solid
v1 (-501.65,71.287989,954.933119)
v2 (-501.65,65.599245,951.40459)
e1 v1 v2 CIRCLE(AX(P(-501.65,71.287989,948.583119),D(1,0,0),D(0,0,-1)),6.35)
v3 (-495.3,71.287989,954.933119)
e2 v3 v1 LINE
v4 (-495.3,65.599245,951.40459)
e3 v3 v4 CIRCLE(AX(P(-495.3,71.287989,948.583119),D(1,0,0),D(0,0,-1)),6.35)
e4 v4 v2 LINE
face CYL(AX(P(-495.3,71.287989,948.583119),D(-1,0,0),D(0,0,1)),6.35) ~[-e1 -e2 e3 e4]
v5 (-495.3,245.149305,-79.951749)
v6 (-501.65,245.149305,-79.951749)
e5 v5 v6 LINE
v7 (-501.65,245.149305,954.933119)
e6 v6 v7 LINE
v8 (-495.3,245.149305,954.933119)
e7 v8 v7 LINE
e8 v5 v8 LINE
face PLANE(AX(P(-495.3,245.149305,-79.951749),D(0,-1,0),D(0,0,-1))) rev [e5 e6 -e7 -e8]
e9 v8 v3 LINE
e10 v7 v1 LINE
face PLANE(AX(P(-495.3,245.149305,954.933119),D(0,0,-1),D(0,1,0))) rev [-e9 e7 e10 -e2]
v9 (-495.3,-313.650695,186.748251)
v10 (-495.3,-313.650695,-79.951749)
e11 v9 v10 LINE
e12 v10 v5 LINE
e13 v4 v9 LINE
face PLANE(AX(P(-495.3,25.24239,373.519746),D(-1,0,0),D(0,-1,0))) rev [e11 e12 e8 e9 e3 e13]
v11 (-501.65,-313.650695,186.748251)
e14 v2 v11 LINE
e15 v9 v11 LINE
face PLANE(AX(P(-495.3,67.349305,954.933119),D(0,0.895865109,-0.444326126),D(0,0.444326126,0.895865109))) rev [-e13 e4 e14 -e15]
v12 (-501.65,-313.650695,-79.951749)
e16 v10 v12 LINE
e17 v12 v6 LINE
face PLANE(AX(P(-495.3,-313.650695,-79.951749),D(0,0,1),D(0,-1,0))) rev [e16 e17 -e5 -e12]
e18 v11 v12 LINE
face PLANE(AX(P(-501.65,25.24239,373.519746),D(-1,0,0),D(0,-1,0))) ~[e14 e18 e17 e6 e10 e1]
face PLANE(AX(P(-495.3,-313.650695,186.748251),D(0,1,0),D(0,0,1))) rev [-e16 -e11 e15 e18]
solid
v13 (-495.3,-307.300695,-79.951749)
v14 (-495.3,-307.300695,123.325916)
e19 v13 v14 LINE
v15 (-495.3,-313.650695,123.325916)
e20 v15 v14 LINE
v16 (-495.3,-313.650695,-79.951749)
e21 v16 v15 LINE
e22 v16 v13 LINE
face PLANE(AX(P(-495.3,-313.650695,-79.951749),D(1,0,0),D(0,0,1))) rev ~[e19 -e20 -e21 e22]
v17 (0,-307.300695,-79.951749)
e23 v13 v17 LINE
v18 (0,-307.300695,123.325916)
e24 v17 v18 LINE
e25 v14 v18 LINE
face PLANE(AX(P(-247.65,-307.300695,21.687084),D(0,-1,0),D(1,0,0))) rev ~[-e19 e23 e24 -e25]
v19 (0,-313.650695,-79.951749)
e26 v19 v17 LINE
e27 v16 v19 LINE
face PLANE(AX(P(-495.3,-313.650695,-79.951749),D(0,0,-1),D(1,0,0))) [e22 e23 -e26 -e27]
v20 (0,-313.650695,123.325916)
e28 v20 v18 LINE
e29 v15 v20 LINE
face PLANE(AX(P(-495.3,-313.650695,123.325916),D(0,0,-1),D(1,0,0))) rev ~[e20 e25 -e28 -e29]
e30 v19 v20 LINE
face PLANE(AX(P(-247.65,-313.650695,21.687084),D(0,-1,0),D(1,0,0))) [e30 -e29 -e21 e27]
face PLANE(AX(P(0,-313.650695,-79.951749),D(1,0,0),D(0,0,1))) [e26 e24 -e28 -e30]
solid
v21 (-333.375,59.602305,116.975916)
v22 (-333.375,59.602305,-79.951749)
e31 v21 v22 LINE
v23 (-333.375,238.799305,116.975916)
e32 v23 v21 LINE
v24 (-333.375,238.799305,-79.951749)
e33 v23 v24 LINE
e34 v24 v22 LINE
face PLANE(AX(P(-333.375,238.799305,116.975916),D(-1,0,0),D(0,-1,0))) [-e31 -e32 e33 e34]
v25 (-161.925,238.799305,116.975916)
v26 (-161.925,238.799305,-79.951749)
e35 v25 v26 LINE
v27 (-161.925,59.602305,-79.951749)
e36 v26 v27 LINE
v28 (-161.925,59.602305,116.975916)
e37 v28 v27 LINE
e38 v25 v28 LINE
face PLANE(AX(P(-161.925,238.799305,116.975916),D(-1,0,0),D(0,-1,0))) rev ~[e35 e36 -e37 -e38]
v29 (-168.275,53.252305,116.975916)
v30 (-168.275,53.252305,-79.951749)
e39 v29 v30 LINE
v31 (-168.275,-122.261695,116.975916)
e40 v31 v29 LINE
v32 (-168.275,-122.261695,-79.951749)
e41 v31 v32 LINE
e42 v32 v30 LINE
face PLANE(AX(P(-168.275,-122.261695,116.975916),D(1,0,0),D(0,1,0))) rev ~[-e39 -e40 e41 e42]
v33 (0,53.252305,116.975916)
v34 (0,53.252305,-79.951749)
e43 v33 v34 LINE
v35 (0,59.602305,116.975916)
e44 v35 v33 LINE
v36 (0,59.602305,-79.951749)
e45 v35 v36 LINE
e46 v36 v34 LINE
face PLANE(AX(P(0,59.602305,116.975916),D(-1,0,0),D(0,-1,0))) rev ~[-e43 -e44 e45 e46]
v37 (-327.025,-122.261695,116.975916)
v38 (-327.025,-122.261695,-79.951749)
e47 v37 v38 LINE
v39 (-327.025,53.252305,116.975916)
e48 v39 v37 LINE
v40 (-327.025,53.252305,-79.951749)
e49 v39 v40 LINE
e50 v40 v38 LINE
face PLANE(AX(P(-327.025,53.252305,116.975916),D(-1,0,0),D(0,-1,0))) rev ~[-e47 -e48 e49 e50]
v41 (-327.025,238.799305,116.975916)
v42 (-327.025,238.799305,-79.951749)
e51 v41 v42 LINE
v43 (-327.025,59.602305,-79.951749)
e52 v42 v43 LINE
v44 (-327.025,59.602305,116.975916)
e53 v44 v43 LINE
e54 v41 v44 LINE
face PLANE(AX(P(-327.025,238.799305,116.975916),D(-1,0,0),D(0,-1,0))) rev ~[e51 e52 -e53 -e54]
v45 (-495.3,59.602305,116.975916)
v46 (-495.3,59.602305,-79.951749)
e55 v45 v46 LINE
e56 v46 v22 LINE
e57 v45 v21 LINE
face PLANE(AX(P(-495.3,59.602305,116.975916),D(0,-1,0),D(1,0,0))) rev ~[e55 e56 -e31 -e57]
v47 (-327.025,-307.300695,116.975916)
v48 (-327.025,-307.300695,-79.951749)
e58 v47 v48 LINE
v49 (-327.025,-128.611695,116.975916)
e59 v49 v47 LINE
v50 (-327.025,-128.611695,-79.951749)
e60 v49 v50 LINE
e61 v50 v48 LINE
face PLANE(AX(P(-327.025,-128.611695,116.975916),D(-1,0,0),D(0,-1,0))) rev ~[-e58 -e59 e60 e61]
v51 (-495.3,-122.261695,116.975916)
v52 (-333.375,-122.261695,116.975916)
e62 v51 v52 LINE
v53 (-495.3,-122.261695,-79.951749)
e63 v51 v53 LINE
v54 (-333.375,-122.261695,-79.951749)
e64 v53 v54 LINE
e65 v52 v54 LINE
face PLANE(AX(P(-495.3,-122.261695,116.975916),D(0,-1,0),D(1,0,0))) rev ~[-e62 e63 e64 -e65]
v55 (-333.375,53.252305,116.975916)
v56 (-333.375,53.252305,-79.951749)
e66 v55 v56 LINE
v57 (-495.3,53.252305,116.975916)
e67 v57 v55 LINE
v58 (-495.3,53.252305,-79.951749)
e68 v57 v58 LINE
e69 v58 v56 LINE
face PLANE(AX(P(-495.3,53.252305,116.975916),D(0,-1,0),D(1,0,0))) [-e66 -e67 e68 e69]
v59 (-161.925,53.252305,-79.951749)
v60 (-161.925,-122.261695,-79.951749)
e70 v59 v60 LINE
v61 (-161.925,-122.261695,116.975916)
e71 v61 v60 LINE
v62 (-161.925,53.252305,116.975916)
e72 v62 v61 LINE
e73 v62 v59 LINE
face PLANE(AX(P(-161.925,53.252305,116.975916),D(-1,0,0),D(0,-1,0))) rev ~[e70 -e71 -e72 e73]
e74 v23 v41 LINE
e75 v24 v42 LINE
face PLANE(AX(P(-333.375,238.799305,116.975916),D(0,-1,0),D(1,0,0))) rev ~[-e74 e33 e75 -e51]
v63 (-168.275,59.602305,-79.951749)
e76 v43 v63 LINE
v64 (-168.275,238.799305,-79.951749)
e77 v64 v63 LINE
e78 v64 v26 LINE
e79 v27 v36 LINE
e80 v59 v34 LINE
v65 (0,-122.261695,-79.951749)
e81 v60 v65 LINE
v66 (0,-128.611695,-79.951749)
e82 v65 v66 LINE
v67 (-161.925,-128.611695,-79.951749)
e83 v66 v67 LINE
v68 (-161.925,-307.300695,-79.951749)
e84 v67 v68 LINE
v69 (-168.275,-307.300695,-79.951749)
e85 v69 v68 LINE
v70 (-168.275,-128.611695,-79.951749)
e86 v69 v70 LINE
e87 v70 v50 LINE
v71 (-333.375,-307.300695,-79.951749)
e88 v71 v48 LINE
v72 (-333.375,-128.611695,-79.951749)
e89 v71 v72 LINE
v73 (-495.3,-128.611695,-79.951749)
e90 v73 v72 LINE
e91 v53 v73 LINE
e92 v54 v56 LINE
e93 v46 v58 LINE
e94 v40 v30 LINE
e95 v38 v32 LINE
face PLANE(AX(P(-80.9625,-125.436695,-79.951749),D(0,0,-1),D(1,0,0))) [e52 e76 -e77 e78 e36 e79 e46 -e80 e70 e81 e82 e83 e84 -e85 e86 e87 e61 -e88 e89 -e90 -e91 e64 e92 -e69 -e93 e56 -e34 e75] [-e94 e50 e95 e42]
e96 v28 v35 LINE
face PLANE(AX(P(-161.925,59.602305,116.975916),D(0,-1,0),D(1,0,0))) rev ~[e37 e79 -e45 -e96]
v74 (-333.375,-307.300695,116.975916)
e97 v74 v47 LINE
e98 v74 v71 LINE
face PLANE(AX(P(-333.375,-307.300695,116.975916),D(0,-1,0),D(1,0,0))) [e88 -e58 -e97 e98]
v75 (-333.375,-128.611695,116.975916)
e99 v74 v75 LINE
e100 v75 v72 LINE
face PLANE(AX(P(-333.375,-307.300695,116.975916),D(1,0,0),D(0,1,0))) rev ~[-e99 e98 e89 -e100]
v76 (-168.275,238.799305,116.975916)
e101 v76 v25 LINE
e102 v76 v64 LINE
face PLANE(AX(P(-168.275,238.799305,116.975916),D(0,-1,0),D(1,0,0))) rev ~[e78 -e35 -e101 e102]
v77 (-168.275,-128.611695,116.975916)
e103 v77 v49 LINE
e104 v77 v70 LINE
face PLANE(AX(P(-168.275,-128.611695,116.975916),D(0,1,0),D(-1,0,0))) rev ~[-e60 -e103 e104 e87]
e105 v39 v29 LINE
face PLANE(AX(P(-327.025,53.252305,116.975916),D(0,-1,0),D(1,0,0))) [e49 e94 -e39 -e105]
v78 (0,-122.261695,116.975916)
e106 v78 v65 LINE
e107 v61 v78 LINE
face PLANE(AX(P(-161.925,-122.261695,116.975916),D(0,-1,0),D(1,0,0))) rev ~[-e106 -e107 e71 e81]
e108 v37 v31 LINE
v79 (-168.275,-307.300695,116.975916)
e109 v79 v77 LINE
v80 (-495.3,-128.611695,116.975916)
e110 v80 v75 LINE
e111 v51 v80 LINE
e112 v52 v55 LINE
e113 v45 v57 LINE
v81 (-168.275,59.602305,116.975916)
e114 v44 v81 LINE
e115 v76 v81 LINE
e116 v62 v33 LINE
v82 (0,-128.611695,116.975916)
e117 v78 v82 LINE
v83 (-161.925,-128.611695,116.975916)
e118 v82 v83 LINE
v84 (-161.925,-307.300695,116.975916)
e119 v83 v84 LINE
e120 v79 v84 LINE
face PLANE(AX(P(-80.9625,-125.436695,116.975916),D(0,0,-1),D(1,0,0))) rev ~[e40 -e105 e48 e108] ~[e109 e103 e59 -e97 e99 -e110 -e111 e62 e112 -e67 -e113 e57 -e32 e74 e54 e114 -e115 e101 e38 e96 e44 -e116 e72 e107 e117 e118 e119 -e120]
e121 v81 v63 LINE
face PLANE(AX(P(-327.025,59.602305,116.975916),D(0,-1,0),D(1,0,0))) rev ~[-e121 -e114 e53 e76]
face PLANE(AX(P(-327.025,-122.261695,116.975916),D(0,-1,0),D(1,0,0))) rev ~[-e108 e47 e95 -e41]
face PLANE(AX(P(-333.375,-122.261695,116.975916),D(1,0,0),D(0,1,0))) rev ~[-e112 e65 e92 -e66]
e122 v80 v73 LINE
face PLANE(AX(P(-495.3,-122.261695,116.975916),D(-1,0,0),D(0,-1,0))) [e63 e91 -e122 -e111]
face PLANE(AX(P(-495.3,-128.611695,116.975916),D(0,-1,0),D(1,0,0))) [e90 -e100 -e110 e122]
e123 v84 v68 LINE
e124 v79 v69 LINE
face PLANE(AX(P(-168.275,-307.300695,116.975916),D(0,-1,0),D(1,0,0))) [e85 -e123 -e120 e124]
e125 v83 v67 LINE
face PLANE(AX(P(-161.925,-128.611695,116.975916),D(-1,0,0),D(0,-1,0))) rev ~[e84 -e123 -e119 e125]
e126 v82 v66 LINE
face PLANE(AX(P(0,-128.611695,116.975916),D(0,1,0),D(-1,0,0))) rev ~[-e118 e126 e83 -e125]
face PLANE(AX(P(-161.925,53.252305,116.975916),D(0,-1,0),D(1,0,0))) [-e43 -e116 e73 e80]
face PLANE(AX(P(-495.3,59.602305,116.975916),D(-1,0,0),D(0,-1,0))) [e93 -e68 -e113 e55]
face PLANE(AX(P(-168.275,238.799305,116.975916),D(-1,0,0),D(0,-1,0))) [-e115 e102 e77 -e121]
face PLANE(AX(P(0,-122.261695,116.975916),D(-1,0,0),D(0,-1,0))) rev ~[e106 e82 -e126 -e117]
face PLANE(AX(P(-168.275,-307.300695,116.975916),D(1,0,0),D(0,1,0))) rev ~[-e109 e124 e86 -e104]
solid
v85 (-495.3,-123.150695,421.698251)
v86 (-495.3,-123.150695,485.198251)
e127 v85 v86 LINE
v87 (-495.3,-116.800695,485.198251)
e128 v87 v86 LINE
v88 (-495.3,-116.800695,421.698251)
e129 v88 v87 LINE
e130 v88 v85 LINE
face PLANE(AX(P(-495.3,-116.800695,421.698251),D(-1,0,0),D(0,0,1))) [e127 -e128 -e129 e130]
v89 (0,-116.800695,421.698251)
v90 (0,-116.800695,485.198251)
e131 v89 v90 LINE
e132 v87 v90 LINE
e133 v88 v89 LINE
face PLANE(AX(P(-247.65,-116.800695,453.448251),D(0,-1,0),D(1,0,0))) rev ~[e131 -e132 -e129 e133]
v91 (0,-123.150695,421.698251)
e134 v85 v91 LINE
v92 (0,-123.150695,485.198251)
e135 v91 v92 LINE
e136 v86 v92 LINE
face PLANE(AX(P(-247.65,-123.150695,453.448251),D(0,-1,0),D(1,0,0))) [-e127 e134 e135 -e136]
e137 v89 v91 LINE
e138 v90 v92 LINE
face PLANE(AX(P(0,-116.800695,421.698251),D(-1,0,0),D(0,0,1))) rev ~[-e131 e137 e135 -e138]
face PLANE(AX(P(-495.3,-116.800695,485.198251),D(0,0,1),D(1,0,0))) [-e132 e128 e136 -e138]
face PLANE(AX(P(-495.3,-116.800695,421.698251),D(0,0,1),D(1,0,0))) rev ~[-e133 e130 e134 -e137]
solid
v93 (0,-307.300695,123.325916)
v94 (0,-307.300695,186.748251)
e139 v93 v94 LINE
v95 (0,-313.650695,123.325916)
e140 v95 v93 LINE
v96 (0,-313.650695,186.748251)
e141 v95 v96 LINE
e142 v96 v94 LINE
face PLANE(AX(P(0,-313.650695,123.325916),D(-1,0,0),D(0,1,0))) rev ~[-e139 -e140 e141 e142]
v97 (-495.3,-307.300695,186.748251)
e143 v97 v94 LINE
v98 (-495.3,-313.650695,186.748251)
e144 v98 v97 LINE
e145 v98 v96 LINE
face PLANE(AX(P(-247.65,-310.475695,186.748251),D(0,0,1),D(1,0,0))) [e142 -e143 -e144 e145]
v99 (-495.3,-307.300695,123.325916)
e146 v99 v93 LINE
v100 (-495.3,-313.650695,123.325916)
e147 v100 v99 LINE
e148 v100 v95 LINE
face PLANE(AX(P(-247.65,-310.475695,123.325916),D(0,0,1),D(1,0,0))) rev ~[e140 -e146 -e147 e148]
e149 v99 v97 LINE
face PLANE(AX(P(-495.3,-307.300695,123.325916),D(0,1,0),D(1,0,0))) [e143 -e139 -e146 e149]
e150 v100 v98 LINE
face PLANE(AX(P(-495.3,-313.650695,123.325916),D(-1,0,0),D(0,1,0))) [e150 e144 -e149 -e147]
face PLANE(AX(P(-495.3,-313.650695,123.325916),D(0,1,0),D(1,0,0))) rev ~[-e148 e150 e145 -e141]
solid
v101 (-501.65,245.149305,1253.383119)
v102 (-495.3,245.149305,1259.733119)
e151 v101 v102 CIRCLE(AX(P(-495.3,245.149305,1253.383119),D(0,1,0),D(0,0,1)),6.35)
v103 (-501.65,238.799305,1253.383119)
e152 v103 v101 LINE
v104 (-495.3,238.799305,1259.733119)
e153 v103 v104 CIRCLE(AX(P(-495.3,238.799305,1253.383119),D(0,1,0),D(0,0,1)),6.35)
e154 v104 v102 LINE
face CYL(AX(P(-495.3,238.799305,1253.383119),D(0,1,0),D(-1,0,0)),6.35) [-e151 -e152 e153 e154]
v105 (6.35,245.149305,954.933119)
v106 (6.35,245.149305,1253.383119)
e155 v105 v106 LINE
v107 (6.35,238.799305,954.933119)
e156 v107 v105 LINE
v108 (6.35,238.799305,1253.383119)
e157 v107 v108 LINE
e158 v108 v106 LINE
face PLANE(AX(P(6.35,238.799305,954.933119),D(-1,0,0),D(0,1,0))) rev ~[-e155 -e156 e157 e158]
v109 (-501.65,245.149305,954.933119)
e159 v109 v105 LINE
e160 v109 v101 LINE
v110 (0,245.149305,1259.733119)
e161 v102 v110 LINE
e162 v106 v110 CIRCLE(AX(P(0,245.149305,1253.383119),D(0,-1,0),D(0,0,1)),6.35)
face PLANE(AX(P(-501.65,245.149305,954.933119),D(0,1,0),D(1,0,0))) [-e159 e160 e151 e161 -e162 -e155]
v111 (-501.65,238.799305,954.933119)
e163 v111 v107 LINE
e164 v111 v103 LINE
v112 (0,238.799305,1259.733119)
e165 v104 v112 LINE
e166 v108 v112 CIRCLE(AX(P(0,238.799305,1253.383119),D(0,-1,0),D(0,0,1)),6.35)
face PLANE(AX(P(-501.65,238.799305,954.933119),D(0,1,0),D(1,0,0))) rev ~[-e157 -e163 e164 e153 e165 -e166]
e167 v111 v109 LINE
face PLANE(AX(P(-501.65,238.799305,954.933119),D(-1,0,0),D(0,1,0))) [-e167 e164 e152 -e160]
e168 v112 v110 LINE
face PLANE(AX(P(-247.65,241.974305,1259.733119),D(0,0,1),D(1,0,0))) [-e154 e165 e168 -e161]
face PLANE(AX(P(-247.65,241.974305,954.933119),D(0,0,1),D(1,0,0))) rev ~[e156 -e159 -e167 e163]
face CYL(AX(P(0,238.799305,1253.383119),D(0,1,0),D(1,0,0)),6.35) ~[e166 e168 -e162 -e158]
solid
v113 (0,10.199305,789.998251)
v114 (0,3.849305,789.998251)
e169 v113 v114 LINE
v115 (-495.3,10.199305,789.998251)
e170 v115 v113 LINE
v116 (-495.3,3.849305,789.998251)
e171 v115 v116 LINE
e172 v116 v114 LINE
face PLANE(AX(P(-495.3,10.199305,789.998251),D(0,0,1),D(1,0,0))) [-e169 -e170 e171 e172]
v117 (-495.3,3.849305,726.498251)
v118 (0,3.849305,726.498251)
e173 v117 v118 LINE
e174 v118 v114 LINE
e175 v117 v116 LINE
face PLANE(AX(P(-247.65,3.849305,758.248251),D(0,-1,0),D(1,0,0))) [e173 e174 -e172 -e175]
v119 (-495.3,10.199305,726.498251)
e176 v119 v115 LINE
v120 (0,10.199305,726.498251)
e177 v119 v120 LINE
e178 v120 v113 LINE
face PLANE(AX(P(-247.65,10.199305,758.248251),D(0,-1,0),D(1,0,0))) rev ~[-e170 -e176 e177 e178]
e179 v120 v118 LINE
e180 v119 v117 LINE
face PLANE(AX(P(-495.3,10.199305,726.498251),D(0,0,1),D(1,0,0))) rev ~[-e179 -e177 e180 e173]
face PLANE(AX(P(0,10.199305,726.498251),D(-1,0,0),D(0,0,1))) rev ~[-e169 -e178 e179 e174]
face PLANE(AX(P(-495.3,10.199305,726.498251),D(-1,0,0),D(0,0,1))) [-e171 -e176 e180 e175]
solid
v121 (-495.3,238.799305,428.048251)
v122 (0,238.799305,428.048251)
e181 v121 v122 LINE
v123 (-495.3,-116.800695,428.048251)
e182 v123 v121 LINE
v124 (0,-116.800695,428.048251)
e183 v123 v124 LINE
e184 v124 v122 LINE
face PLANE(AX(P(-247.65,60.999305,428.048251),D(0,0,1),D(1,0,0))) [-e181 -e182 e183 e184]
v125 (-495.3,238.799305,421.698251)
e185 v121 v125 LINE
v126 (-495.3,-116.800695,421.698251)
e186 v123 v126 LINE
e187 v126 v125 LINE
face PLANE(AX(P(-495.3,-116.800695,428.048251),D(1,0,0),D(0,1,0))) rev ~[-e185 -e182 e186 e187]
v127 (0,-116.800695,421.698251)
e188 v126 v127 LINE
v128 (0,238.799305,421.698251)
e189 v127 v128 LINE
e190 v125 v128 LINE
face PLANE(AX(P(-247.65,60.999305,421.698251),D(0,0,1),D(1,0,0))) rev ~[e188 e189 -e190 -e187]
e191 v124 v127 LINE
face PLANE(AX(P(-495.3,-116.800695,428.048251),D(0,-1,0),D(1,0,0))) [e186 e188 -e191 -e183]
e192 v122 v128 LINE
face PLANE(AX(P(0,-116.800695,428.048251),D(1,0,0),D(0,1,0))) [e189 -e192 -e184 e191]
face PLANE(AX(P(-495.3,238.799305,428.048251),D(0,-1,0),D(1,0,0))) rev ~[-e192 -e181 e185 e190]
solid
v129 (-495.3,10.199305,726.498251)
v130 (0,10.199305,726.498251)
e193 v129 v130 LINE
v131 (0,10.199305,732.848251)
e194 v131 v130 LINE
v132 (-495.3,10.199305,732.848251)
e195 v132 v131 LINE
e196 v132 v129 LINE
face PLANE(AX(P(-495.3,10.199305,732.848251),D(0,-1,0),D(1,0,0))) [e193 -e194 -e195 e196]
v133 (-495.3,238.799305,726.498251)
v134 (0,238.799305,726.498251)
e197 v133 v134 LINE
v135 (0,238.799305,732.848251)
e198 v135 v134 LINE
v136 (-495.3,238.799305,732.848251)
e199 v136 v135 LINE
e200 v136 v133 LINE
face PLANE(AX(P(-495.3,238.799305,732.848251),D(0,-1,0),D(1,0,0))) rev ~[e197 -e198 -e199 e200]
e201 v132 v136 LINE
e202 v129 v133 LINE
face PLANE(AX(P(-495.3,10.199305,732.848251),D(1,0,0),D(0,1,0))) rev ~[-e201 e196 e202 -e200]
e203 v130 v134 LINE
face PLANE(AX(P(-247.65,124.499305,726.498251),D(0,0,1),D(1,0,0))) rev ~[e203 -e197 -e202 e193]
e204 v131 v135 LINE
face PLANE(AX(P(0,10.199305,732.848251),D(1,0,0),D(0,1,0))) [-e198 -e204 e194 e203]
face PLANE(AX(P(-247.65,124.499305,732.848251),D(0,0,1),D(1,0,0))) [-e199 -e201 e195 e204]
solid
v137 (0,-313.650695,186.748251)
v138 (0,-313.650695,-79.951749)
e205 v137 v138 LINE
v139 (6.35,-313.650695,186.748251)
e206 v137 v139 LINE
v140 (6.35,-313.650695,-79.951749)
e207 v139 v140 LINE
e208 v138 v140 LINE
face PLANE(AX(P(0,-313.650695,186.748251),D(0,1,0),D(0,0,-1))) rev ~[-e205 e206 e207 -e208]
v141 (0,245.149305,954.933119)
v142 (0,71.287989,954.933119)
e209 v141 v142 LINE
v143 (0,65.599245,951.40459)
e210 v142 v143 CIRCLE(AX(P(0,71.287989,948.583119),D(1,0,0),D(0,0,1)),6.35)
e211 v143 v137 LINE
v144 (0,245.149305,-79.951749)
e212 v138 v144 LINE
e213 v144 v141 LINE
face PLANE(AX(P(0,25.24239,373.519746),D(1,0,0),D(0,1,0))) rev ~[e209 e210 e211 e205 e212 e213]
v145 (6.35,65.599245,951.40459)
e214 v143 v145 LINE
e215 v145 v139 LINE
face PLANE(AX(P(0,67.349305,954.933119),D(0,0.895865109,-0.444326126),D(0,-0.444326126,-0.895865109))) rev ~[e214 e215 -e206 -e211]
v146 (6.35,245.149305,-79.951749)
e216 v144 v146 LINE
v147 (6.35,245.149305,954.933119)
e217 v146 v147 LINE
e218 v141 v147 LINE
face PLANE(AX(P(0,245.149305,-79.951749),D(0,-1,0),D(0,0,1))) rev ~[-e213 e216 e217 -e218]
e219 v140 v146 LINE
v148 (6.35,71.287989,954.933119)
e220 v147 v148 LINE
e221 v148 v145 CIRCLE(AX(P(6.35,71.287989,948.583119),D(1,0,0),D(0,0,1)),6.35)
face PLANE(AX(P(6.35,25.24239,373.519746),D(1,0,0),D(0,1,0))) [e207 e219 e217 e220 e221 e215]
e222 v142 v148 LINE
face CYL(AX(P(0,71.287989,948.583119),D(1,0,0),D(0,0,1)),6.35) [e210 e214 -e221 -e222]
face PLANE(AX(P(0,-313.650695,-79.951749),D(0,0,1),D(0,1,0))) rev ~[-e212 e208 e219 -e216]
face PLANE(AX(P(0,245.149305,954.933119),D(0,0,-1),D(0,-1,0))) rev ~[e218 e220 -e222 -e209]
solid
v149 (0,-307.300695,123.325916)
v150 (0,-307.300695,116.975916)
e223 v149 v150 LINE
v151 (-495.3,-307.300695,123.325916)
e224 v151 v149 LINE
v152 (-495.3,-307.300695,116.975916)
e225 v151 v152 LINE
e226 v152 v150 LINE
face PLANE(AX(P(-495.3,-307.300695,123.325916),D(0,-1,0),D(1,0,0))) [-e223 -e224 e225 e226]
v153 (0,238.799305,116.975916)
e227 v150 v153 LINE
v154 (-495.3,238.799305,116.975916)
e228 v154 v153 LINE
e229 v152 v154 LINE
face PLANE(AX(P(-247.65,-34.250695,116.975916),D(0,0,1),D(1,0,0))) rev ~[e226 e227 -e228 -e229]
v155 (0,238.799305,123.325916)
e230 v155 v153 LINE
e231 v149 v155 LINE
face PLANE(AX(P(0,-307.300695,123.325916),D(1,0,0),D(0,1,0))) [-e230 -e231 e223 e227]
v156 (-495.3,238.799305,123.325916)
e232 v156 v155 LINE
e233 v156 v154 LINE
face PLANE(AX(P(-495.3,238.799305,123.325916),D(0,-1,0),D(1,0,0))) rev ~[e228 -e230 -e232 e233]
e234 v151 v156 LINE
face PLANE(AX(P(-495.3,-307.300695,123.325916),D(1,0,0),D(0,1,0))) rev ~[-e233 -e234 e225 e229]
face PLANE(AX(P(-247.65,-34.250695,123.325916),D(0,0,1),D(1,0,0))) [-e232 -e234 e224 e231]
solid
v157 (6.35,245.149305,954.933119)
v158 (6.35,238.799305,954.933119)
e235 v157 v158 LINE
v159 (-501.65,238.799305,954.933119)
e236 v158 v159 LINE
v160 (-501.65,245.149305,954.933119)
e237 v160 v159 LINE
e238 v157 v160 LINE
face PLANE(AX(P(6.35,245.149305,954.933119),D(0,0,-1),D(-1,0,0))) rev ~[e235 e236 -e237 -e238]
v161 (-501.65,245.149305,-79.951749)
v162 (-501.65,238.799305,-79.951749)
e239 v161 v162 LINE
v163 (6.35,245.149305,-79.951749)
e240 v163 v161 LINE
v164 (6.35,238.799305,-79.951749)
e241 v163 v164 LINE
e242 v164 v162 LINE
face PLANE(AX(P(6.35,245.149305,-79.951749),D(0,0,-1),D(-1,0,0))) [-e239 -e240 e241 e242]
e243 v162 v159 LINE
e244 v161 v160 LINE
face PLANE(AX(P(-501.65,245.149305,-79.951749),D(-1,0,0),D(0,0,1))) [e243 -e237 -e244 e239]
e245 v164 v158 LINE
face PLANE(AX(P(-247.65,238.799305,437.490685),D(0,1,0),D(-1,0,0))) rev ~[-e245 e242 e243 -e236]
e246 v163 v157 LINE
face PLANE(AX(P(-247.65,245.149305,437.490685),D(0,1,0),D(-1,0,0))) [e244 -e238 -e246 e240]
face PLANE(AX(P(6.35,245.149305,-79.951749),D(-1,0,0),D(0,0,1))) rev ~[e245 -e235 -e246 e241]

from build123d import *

# Parameters (mm, degrees)
F1_DEPTH  = 6.35
F2_W      = 508
F2_H      = 1034.8848681509
F3_DEPTH  = 6.35
F7_W      = 495.3
F7_H      = 203.2776648521
F8_DEPTH  = 6.35
F9_W      = 495.3
F9_H      = 546.1
F10_DEPTH = 6.35
F12_W     = 495.3
F12_H     = 355.6
F13_DEPTH = 6.35
F14_W     = 495.3
F14_H     = 63.5
F15_DEPTH = 6.35
F17_W     = 495.3
F17_H     = 228.6
F18_DEPTH = 6.35
F19_W     = 495.3
F19_H     = 63.5
F20_DEPTH = 6.35
F21_W     = 508
F21_H     = 6.35
F22_DEPTH = 304.8
F23_R     = 6.35
F24_W     = 161.925
F24_H     = 6.35
F24_W_2   = 6.35
F24_H_2   = 178.689
F24_W_3   = 158.75
F24_H_3   = 175.514
F24_H_4   = 179.197
F25_DEPTH = 196.9276648521
F26_W     = 495.3
F26_H     = 6.35
F27_DEPTH = 63.4223351
F28_R     = 6.35
F28_2_R   = 6.35


# Not quite as in the source:
# - an extrude ends at something that could not be found from the text; its depth is read off the source's solid


with BuildPart() as f1:
    # F0 (on Right) → F1 (new body)
    with BuildSketch(Plane.YZ):
        Polygon((-313.6506947781, 123.2482513189), (-313.6506947781, -79.9517486811), (245.1493052219, -79.9517486811), (245.1493052219, 954.9331194699), (67.3493052219, 954.9331194699), (-313.6506947781, 186.7482513189), align=None)
    extrude(amount=F1_DEPTH)


with BuildPart() as f3:
    # F2 (on face) → F3 (new body)
    with BuildSketch(Plane(origin=(0, 245.1493052219, 0), x_dir=(-1, 0, 0), z_dir=(0, 1, 0))):
        with Locations((247.65, 437.4906853944)):
            Rectangle(F2_W, F2_H)
    extrude(amount=-F3_DEPTH)


with BuildPart() as f6_1:
    # F6: instance of F1
    add(f1.part.mirror(Plane.YZ.offset(-247.65)))

    # F28#2
    f28_2_edges = [f6_1.edges().sort_by_distance(p)[0] for p in [
        (-498.475, 67.349305, 954.933119),
    ]]
    fillet(f28_2_edges, radius=F28_2_R)


with BuildPart() as f8:
    # F7 (on face) → F8 (new body)
    with BuildSketch(Plane.XZ.offset(313.6506947781)):
        with Locations((-247.65, 21.687083745)):
            Rectangle(F7_W, F7_H)
    extrude(amount=-F8_DEPTH)


with BuildPart() as f10:
    # F9 (on face) → F10 (new body)
    with BuildSketch(Plane.XY.offset(123.3259161711)):
        with Locations((-247.65, -34.2506947781)):
            Rectangle(F9_W, F9_H)
    extrude(amount=-F10_DEPTH)


with BuildPart() as f13:
    # F12 (on plane+point) → F13 (new body)
    with BuildSketch(Plane.XY.offset(428.0482513189)):
        with Locations((-247.65, 60.9993052219)):
            Rectangle(F12_W, F12_H)
    extrude(amount=-F13_DEPTH)


with BuildPart() as f15:
    # F14 (on face) → F15 (new body)
    with BuildSketch(Plane.XZ.offset(116.8006947781)):
        with Locations((-247.65, 453.4482513189)):
            Rectangle(F14_W, F14_H)
    extrude(amount=F15_DEPTH)


with BuildPart() as f18:
    # F17 (on plane+point) → F18 (new body)
    with BuildSketch(Plane.XY.offset(732.8482513189)):
        with Locations((-247.65, 124.4993052219)):
            Rectangle(F17_W, F17_H)
    extrude(amount=-F18_DEPTH)


with BuildPart() as f20:
    # F19 (on face) → F20 (new body)
    with BuildSketch(Plane.XZ.offset(-10.1993052219)):
        with Locations((-247.65, 758.2482513189)):
            Rectangle(F19_W, F19_H)
    extrude(amount=F20_DEPTH)


with BuildPart() as f22:
    # F21 (on face) → F22 (new body)
    with BuildSketch(Plane.XY.offset(954.9331194699)):
        with Locations((-247.65, 241.9743052219)):
            Rectangle(F21_W, F21_H)
    extrude(amount=F22_DEPTH)

    # F23
    f23_edges = [f22.edges().sort_by_distance(p)[0] for p in [
        (6.35, 241.974305, 1259.733119),
        (-501.65, 241.974305, 1259.733119),
    ]]
    fillet(f23_edges, radius=F23_R)


with BuildPart() as f25:
    # F24 (on face) → F25 (new body, through all)
    with BuildSketch(Plane(origin=(0, 0, 116.9759161711), x_dir=(1, 0, 0), z_dir=(0, 0, -1))):
        with Locations((-80.9625, 125.4366947781)):
            Rectangle(F24_W, F24_H)
        with Locations((-165.1, 125.4366947781)):
            Rectangle(F24_W_2, F24_H)
        with Locations((-165.1, 217.9561947781)):
            Rectangle(F24_W_2, F24_H_2)
        with Locations((-247.65, 125.4366947781)):
            Rectangle(F24_W_3, F24_H)
        with Locations((-165.1, 34.5046947781)):
            Rectangle(F24_W_2, F24_H_3)
        with Locations((-330.2, 125.4366947781)):
            Rectangle(F24_W_2, F24_H)
        with Locations((-330.2, 217.9561947781)):
            Rectangle(F24_W_2, F24_H_2)
        with Locations((-165.1, -56.4273052219)):
            Rectangle(F24_W_2, F24_H)
        with Locations((-80.9625, -56.4273052219)):
            Rectangle(F24_W, F24_H)
        with Locations((-414.3375, 125.4366947781)):
            Rectangle(F24_W, F24_H)
        with Locations((-330.2, 34.5046947781)):
            Rectangle(F24_W_2, F24_H_3)
        with Locations((-247.65, -56.4273052219)):
            Rectangle(F24_W_3, F24_H)
        with Locations((-165.1, -149.2008052219)):
            Rectangle(F24_W_2, F24_H_4)
        with Locations((-330.2, -56.4273052219)):
            Rectangle(F24_W_2, F24_H)
        with Locations((-414.3375, -56.4273052219)):
            Rectangle(F24_W, F24_H)
        with Locations((-330.2, -149.2008052219)):
            Rectangle(F24_W_2, F24_H_4)
    extrude(amount=F25_DEPTH)


with BuildPart() as f27:
    # F26 (on face) → F27 (new body, through all)
    with BuildSketch(Plane.XY.offset(123.3259161711)):
        with Locations((-247.65, -310.4756947781)):
            Rectangle(F26_W, F26_H)
    extrude(amount=F27_DEPTH)


with BuildPart() as f1_1:
    add(f1.part)

    # F28
    f28_edges = [f1_1.edges().sort_by_distance(p)[0] for p in [
        (3.175, 67.349305, 954.933119),
    ]]
    fillet(f28_edges, radius=F28_R)


solid = Compound([f3.part, f6_1.part, f8.part, f10.part, f13.part, f15.part, f18.part, f20.part, f22.part, f25.part, f27.part, f1_1.part])
